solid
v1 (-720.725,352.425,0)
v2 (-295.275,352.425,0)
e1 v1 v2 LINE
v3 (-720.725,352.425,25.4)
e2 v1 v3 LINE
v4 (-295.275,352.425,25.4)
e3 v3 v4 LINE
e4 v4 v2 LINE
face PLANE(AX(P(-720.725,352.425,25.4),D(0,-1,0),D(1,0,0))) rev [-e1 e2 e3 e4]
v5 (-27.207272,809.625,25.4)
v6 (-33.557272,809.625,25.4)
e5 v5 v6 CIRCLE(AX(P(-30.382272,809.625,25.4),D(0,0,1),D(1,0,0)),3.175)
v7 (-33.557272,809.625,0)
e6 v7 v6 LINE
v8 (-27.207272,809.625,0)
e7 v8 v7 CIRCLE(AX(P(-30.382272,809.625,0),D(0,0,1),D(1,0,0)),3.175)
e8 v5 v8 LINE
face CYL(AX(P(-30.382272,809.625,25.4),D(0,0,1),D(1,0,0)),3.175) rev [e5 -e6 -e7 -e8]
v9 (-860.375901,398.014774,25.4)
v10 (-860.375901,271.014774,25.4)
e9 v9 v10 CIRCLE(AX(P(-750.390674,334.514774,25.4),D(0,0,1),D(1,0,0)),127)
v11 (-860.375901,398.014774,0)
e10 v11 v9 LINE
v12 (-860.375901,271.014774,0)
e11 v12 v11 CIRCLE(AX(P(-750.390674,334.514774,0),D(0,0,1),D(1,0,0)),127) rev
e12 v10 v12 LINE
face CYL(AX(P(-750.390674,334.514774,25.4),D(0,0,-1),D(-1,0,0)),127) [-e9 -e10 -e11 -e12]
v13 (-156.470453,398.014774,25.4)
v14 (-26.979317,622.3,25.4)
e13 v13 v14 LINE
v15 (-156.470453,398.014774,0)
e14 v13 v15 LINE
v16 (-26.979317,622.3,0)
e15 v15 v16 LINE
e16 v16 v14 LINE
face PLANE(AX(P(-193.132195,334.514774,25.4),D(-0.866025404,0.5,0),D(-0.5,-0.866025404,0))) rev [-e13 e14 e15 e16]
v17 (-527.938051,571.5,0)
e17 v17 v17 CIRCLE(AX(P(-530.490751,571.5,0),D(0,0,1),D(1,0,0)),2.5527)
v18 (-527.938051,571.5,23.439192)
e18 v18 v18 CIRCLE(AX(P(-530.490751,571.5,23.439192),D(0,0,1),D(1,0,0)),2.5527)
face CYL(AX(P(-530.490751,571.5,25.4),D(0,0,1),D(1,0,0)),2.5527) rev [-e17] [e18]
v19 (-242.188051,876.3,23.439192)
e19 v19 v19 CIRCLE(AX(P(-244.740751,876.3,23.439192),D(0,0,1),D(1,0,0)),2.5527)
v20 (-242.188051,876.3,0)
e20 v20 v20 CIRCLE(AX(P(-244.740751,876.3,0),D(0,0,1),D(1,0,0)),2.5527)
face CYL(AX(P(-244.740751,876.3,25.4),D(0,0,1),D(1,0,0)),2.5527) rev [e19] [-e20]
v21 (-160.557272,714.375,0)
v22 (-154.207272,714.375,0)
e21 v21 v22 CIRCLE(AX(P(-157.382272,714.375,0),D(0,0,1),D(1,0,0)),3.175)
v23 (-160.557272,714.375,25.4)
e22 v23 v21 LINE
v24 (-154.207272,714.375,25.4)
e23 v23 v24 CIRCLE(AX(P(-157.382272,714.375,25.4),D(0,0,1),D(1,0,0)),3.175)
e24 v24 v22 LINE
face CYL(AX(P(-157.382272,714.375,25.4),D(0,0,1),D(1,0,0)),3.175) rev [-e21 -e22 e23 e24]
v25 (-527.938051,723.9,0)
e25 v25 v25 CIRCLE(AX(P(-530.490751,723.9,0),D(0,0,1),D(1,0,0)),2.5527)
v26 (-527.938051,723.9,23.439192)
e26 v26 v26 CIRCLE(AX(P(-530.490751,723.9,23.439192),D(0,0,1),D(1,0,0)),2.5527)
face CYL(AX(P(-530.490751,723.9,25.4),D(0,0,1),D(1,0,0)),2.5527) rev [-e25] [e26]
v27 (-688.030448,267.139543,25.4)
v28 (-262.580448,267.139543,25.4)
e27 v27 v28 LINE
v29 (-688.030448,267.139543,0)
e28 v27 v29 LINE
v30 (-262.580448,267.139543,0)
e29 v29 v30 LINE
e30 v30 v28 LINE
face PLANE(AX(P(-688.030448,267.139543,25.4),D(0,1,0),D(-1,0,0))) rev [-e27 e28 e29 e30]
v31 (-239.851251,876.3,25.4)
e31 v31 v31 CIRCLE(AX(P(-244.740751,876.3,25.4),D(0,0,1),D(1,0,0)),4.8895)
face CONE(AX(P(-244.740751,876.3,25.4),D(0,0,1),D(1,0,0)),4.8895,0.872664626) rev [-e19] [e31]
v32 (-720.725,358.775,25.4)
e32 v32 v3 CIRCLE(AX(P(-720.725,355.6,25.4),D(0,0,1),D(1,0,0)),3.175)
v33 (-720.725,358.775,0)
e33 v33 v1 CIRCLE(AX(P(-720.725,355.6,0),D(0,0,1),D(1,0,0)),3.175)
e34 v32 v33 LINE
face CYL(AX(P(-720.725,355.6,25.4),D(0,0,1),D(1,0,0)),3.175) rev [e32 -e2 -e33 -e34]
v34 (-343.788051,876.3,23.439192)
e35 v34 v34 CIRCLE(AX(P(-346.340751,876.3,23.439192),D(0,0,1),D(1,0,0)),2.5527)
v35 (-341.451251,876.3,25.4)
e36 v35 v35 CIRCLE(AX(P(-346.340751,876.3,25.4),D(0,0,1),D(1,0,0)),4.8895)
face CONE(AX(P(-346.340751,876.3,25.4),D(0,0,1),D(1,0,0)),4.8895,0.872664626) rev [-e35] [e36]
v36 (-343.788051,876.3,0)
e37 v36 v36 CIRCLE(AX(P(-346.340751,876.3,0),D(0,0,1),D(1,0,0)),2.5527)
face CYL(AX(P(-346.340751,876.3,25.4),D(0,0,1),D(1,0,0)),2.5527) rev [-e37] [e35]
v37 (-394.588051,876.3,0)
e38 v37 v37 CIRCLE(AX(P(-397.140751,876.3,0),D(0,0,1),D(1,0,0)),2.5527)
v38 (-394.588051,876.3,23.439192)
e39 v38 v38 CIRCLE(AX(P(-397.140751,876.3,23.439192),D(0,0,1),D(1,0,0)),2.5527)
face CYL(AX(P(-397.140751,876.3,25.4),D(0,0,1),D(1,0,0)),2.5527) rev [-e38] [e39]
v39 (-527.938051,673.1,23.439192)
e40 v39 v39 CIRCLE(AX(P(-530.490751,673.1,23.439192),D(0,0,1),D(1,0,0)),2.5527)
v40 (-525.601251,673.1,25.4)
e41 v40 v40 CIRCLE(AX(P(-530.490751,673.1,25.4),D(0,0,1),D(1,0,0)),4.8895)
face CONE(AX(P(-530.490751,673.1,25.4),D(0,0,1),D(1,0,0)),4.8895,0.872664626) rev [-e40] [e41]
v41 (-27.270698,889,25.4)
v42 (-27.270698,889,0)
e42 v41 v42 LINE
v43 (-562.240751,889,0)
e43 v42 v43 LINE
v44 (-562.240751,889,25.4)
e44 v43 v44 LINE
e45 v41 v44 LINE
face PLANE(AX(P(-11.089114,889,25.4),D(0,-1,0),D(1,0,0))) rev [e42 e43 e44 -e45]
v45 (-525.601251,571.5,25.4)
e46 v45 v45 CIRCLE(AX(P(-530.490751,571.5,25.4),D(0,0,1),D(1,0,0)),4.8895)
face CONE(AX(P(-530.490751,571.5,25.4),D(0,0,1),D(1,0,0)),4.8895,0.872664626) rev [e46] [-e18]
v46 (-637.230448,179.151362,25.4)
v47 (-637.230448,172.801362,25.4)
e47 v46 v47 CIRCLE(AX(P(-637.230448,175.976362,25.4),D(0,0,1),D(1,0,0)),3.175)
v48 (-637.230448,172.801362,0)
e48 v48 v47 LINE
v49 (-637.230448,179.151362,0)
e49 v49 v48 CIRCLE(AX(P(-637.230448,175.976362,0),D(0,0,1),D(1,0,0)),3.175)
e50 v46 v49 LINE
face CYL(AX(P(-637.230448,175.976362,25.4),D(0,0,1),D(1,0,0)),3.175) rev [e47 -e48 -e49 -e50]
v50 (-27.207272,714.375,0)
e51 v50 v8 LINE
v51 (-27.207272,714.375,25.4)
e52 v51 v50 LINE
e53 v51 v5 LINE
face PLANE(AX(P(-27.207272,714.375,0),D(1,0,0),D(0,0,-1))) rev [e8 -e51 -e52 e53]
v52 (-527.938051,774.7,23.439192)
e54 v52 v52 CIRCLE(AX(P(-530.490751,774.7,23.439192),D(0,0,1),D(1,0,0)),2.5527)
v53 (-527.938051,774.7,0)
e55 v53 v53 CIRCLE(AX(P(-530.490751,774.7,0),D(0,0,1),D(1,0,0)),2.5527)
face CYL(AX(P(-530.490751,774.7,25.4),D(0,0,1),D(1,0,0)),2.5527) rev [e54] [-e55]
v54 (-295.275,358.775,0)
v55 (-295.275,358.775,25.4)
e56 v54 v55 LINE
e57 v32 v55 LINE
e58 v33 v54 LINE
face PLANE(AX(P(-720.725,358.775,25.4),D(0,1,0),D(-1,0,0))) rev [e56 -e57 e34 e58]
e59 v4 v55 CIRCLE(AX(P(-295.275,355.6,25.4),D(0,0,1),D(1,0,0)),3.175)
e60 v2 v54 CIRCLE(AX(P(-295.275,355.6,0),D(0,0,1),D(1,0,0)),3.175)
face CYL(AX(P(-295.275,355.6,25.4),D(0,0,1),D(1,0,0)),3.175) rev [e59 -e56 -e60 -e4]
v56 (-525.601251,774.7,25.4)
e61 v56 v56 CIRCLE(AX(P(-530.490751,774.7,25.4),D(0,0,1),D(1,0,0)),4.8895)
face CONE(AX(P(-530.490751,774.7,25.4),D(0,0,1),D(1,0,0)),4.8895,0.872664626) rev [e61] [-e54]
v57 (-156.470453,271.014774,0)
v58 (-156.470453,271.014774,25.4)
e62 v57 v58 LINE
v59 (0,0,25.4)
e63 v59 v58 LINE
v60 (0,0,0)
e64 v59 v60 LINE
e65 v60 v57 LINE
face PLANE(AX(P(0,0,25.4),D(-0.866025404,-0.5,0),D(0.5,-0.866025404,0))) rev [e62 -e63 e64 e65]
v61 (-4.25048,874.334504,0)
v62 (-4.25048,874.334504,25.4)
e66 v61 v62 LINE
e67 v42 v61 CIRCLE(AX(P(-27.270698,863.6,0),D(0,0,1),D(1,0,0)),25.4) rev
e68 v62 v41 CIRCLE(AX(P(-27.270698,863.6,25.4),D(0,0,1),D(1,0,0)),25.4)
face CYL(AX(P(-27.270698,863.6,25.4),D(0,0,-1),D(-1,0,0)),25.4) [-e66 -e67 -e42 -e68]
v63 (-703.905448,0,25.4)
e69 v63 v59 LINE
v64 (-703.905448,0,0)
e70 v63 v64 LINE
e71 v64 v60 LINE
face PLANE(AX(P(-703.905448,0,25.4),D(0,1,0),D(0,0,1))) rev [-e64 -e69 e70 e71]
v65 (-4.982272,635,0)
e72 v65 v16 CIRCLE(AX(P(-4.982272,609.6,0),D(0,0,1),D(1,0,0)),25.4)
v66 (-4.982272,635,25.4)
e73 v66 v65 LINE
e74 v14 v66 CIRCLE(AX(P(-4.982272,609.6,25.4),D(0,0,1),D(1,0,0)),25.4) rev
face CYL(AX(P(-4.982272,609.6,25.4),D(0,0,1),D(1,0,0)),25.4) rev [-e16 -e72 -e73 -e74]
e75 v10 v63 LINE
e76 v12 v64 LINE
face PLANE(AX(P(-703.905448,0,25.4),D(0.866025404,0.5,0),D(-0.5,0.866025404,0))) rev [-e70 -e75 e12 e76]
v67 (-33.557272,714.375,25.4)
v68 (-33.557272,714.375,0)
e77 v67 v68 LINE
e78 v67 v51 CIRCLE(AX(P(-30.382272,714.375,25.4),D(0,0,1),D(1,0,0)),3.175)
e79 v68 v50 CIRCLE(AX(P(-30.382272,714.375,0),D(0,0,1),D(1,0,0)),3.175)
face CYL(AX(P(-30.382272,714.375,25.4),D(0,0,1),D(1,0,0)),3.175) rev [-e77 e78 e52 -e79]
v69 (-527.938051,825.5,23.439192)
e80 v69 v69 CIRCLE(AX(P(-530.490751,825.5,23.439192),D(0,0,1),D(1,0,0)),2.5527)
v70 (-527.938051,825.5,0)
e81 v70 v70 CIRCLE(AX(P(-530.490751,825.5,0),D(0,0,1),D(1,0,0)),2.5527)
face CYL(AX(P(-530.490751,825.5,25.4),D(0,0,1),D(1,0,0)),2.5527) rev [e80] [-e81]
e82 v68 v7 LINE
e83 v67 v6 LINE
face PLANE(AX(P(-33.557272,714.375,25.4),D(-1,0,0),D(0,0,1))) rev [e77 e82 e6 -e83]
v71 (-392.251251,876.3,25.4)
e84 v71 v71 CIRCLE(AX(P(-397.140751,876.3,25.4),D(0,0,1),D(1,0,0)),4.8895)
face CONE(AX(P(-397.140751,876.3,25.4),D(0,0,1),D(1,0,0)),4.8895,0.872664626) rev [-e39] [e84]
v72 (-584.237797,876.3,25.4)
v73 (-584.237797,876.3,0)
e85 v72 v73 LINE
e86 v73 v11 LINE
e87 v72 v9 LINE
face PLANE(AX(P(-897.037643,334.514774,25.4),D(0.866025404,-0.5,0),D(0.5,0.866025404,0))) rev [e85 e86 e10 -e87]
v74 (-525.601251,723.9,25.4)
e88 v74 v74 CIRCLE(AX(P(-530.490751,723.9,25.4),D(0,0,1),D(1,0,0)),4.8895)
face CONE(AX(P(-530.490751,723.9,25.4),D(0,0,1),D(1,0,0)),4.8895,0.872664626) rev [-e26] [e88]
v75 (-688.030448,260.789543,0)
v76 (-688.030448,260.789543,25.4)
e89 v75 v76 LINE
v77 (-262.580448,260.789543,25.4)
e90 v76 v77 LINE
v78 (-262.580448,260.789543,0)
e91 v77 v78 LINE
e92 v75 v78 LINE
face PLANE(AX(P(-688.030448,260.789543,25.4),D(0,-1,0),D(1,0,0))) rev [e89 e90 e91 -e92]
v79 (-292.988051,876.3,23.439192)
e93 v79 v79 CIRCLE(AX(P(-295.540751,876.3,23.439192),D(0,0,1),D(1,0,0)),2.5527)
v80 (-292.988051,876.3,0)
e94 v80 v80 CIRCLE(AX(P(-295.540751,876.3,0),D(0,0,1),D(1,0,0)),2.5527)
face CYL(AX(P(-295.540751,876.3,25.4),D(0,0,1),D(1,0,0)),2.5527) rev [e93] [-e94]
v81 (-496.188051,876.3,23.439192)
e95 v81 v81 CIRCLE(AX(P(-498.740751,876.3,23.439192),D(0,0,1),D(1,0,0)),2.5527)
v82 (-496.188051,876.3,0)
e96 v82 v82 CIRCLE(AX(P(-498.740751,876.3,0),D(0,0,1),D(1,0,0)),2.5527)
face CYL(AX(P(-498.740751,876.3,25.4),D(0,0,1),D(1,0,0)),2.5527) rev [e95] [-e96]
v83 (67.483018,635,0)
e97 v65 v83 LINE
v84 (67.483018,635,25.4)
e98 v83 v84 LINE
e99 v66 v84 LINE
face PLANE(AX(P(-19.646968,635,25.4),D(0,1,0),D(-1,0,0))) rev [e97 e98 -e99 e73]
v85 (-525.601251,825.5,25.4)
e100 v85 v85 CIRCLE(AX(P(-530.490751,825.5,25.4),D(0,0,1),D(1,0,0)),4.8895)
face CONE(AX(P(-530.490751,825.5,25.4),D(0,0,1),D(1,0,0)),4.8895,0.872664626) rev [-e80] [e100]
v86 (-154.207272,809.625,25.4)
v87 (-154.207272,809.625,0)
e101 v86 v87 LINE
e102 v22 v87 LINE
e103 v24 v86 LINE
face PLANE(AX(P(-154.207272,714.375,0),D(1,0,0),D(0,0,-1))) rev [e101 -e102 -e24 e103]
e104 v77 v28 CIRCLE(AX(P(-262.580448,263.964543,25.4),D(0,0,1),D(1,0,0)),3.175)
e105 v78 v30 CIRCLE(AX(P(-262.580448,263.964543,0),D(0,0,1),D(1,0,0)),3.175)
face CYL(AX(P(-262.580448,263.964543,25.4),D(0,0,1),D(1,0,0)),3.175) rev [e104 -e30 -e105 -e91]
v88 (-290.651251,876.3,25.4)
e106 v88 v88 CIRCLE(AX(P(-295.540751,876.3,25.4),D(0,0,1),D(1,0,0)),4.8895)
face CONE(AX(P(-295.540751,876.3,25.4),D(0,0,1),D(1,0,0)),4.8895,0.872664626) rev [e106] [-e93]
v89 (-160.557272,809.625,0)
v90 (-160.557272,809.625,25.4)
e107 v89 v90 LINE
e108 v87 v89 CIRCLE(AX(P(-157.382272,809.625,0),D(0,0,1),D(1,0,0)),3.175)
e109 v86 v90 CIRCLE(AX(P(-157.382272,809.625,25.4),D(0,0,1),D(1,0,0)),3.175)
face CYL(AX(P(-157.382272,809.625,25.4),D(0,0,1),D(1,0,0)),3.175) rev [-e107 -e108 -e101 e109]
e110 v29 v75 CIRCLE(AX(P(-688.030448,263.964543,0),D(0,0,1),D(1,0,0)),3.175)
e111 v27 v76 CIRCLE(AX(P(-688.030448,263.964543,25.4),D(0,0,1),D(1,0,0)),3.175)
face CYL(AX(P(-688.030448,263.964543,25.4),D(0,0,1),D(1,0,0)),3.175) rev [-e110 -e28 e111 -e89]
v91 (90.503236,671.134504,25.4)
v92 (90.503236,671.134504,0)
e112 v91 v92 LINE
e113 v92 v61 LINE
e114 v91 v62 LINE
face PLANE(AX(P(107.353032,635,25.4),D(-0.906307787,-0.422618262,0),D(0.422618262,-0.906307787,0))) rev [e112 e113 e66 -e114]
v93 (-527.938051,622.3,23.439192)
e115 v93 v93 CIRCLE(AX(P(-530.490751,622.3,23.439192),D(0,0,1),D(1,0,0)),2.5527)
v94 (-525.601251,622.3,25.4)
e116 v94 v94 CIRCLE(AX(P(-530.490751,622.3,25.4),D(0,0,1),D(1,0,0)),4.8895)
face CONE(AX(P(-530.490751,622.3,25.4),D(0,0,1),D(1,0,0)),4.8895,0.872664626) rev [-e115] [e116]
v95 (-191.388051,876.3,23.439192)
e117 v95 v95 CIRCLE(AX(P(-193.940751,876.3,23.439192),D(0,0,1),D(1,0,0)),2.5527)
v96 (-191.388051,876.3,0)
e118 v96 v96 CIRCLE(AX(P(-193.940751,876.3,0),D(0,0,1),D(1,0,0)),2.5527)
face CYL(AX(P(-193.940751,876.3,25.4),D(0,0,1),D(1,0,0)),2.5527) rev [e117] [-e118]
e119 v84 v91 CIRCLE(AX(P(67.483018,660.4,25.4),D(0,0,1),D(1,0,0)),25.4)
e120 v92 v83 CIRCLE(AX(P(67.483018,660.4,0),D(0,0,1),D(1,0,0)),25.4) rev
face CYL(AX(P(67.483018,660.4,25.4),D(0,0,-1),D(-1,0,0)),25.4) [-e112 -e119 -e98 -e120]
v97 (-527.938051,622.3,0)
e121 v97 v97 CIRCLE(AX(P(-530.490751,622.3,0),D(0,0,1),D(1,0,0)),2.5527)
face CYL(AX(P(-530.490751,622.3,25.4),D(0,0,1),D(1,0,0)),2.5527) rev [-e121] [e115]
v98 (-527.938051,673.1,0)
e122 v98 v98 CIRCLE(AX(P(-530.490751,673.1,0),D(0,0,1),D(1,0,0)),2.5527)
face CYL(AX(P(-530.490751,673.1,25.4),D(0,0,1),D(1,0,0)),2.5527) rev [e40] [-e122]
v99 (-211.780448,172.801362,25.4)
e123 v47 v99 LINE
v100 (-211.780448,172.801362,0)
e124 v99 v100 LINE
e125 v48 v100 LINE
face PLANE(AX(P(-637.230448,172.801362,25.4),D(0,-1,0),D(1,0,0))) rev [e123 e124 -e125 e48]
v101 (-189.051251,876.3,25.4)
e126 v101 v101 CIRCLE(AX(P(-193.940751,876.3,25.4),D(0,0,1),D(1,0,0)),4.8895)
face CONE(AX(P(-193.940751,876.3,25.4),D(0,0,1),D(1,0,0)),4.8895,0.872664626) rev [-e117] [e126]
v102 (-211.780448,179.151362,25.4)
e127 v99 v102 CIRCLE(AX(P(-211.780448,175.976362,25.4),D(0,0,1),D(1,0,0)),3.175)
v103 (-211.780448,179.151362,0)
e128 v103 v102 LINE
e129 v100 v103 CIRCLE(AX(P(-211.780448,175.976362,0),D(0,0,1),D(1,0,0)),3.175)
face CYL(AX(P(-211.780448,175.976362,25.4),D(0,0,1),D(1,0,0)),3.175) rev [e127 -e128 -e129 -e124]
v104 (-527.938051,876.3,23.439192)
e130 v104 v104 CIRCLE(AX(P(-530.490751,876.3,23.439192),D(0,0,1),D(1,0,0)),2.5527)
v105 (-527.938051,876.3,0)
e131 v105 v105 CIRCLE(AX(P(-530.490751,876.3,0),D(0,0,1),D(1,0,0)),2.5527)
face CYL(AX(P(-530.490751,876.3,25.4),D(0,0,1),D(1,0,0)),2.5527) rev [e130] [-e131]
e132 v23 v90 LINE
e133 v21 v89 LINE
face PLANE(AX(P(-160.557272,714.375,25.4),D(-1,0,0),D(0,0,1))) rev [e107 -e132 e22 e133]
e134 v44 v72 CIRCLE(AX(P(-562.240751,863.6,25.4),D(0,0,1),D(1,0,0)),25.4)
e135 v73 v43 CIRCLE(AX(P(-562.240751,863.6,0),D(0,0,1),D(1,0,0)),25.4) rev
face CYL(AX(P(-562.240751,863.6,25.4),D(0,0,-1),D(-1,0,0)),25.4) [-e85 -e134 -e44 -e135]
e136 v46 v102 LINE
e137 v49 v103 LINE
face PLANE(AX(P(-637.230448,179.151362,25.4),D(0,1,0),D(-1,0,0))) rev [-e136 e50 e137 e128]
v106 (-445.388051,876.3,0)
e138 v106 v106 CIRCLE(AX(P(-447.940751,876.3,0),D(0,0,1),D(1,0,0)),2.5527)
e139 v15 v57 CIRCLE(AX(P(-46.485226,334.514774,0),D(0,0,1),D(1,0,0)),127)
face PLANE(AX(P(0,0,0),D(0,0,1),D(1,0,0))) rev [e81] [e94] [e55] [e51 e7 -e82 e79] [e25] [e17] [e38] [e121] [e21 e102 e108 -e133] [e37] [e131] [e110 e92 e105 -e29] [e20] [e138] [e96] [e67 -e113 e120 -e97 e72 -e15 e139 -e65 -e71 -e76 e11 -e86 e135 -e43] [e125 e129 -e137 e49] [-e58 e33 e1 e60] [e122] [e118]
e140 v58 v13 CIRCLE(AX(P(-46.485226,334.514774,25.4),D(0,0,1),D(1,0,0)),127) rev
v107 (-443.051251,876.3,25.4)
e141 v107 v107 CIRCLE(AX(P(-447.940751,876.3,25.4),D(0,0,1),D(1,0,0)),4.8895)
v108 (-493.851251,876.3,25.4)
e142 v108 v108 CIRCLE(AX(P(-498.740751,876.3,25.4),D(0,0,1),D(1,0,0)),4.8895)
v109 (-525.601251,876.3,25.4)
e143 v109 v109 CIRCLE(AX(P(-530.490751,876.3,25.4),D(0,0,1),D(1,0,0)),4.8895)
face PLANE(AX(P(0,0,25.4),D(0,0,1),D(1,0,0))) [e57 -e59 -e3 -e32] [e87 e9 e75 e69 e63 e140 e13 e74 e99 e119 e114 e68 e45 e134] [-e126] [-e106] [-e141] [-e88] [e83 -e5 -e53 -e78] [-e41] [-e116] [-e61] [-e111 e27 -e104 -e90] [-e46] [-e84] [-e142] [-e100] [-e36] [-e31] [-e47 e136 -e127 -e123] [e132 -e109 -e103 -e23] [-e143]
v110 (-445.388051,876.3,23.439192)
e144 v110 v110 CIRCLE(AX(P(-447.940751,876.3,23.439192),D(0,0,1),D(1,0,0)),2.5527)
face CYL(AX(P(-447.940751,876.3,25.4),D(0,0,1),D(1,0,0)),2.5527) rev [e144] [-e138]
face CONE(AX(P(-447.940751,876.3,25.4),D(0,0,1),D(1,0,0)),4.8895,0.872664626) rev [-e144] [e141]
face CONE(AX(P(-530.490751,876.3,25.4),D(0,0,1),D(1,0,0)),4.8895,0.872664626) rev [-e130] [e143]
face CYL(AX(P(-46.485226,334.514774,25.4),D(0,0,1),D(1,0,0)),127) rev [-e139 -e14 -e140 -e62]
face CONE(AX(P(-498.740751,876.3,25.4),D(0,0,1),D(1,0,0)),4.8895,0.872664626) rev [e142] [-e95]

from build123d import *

# Parameters (mm, degrees)
BOSS_EXTRUDE1_DEPTH                                = 25.4
FILLET1_R                                          = 127
FILLET2_R                                          = 25.4
WHEEL_SLOT_DEPTH                                   = 25.4
PEDAL_SLOT_DEPTH                                   = 25.4
CSK_FOR_10_FLAT_HEAD_MACHINE_SCREW_100_D           = 5.1054
CSK_FOR_10_FLAT_HEAD_MACHINE_SCREW_100_CSINK_D     = 9.779
CSK_FOR_10_FLAT_HEAD_MACHINE_SCREW_100_CSINK_ANGLE = 100


# Read off the part's stored shape, not the designer's step: wheel slot, pedal slot
with BuildPart() as part:
    # Sketch1 → Boss-Extrude1 (new body)
    with BuildSketch(Plane.XY):
        Polygon((0, 0), (-193.132194655, 334.514773719), (-19.646968374, 635), (107.353031626, 635), (-11.089113546, 889), (-576.905448196, 889), (-897.037642851, 334.514773719), (-703.905448196, 0), align=None)
    extrude(amount=BOSS_EXTRUDE1_DEPTH)

    # Fillet1
    fillet1_edges = [part.edges().sort_by_distance(p)[0] for p in [
        (-897.037642851, 334.514773719, 12.7),
        (-193.132194655, 334.514773719, 12.7),
    ]]
    fillet(fillet1_edges, radius=FILLET1_R)

    # Fillet2
    fillet2_edges = [part.edges().sort_by_distance(p)[0] for p in [
        (-576.905448196, 889, 12.7),
        (-11.089113546, 889, 12.7),
        (107.353031626, 635, 12.7),
        (-19.646968374, 635, 12.7),
    ]]
    fillet(fillet2_edges, radius=FILLET2_R)

    # wheel slot outline → wheel slot (cut)
    with BuildSketch(Plane.XY):
        with BuildLine():
            Line((-154.207271537, 714.375), (-154.207271537, 809.625))
            ThreePointArc((-154.207271537, 809.625), (-157.382271537, 812.8), (-160.557271537, 809.625))
            Line((-160.557271537, 809.625), (-160.557271537, 714.375))
            ThreePointArc((-160.557271537, 714.375), (-157.382271537, 711.2), (-154.207271537, 714.375))
        make_face()
        with BuildLine():
            Line((-27.207271537, 714.375), (-27.207271537, 809.625))
            ThreePointArc((-27.207271537, 809.625), (-30.382271537, 812.8), (-33.557271537, 809.625))
            Line((-33.557271537, 809.625), (-33.557271537, 714.375))
            ThreePointArc((-33.557271537, 714.375), (-30.382271537, 711.2), (-27.207271537, 714.375))
        make_face()
    extrude(amount=WHEEL_SLOT_DEPTH, mode=Mode.SUBTRACT)

    # pedal slot outline → pedal slot (cut)
    with BuildSketch(Plane.XY):
        with BuildLine():
            Line((-720.725, 352.425), (-295.275, 352.425))
            ThreePointArc((-295.275, 352.425), (-292.1, 355.6), (-295.275, 358.775))
            Line((-295.275, 358.775), (-720.725, 358.775))
            ThreePointArc((-720.725, 358.775), (-723.9, 355.6), (-720.725, 352.425))
        make_face()
        with BuildLine():
            Line((-688.030448196, 260.789543073), (-262.580448196, 260.789543073))
            ThreePointArc((-262.580448196, 260.789543073), (-259.405448196, 263.964543073), (-262.580448196, 267.139543073))
            Line((-262.580448196, 267.139543073), (-688.030448196, 267.139543073))
            ThreePointArc((-688.030448196, 267.139543073), (-691.205448196, 263.964543073), (-688.030448196, 260.789543073))
        make_face()
        with BuildLine():
            Line((-637.230448196, 172.801362049), (-211.780448196, 172.801362049))
            ThreePointArc((-211.780448196, 172.801362049), (-208.605448196, 175.976362049), (-211.780448196, 179.151362049))
            Line((-211.780448196, 179.151362049), (-637.230448196, 179.151362049))
            ThreePointArc((-637.230448196, 179.151362049), (-640.405448196, 175.976362049), (-637.230448196, 172.801362049))
        make_face()
    extrude(amount=PEDAL_SLOT_DEPTH, mode=Mode.SUBTRACT)

    # CSK for #10 Flat Head Machine Screw (100)1 (through all)
    with Locations(Plane.XY.offset(25.4)):
        with Locations((-530.490751359, 876.3), (-530.490751359, 825.5), (-498.740751359, 876.3), (-447.940751359, 876.3), (-397.140751359, 876.3), (-346.340751359, 876.3), (-295.540751359, 876.3), (-244.740751359, 876.3), (-530.490751359, 774.7), (-530.490751359, 723.9), (-530.490751359, 673.1), (-530.490751359, 622.3), (-530.490751359, 571.5), (-193.940751359, 876.3)):
            CounterSinkHole(CSK_FOR_10_FLAT_HEAD_MACHINE_SCREW_100_D / 2, CSK_FOR_10_FLAT_HEAD_MACHINE_SCREW_100_CSINK_D / 2, counter_sink_angle=CSK_FOR_10_FLAT_HEAD_MACHINE_SCREW_100_CSINK_ANGLE)


solid = part.part
